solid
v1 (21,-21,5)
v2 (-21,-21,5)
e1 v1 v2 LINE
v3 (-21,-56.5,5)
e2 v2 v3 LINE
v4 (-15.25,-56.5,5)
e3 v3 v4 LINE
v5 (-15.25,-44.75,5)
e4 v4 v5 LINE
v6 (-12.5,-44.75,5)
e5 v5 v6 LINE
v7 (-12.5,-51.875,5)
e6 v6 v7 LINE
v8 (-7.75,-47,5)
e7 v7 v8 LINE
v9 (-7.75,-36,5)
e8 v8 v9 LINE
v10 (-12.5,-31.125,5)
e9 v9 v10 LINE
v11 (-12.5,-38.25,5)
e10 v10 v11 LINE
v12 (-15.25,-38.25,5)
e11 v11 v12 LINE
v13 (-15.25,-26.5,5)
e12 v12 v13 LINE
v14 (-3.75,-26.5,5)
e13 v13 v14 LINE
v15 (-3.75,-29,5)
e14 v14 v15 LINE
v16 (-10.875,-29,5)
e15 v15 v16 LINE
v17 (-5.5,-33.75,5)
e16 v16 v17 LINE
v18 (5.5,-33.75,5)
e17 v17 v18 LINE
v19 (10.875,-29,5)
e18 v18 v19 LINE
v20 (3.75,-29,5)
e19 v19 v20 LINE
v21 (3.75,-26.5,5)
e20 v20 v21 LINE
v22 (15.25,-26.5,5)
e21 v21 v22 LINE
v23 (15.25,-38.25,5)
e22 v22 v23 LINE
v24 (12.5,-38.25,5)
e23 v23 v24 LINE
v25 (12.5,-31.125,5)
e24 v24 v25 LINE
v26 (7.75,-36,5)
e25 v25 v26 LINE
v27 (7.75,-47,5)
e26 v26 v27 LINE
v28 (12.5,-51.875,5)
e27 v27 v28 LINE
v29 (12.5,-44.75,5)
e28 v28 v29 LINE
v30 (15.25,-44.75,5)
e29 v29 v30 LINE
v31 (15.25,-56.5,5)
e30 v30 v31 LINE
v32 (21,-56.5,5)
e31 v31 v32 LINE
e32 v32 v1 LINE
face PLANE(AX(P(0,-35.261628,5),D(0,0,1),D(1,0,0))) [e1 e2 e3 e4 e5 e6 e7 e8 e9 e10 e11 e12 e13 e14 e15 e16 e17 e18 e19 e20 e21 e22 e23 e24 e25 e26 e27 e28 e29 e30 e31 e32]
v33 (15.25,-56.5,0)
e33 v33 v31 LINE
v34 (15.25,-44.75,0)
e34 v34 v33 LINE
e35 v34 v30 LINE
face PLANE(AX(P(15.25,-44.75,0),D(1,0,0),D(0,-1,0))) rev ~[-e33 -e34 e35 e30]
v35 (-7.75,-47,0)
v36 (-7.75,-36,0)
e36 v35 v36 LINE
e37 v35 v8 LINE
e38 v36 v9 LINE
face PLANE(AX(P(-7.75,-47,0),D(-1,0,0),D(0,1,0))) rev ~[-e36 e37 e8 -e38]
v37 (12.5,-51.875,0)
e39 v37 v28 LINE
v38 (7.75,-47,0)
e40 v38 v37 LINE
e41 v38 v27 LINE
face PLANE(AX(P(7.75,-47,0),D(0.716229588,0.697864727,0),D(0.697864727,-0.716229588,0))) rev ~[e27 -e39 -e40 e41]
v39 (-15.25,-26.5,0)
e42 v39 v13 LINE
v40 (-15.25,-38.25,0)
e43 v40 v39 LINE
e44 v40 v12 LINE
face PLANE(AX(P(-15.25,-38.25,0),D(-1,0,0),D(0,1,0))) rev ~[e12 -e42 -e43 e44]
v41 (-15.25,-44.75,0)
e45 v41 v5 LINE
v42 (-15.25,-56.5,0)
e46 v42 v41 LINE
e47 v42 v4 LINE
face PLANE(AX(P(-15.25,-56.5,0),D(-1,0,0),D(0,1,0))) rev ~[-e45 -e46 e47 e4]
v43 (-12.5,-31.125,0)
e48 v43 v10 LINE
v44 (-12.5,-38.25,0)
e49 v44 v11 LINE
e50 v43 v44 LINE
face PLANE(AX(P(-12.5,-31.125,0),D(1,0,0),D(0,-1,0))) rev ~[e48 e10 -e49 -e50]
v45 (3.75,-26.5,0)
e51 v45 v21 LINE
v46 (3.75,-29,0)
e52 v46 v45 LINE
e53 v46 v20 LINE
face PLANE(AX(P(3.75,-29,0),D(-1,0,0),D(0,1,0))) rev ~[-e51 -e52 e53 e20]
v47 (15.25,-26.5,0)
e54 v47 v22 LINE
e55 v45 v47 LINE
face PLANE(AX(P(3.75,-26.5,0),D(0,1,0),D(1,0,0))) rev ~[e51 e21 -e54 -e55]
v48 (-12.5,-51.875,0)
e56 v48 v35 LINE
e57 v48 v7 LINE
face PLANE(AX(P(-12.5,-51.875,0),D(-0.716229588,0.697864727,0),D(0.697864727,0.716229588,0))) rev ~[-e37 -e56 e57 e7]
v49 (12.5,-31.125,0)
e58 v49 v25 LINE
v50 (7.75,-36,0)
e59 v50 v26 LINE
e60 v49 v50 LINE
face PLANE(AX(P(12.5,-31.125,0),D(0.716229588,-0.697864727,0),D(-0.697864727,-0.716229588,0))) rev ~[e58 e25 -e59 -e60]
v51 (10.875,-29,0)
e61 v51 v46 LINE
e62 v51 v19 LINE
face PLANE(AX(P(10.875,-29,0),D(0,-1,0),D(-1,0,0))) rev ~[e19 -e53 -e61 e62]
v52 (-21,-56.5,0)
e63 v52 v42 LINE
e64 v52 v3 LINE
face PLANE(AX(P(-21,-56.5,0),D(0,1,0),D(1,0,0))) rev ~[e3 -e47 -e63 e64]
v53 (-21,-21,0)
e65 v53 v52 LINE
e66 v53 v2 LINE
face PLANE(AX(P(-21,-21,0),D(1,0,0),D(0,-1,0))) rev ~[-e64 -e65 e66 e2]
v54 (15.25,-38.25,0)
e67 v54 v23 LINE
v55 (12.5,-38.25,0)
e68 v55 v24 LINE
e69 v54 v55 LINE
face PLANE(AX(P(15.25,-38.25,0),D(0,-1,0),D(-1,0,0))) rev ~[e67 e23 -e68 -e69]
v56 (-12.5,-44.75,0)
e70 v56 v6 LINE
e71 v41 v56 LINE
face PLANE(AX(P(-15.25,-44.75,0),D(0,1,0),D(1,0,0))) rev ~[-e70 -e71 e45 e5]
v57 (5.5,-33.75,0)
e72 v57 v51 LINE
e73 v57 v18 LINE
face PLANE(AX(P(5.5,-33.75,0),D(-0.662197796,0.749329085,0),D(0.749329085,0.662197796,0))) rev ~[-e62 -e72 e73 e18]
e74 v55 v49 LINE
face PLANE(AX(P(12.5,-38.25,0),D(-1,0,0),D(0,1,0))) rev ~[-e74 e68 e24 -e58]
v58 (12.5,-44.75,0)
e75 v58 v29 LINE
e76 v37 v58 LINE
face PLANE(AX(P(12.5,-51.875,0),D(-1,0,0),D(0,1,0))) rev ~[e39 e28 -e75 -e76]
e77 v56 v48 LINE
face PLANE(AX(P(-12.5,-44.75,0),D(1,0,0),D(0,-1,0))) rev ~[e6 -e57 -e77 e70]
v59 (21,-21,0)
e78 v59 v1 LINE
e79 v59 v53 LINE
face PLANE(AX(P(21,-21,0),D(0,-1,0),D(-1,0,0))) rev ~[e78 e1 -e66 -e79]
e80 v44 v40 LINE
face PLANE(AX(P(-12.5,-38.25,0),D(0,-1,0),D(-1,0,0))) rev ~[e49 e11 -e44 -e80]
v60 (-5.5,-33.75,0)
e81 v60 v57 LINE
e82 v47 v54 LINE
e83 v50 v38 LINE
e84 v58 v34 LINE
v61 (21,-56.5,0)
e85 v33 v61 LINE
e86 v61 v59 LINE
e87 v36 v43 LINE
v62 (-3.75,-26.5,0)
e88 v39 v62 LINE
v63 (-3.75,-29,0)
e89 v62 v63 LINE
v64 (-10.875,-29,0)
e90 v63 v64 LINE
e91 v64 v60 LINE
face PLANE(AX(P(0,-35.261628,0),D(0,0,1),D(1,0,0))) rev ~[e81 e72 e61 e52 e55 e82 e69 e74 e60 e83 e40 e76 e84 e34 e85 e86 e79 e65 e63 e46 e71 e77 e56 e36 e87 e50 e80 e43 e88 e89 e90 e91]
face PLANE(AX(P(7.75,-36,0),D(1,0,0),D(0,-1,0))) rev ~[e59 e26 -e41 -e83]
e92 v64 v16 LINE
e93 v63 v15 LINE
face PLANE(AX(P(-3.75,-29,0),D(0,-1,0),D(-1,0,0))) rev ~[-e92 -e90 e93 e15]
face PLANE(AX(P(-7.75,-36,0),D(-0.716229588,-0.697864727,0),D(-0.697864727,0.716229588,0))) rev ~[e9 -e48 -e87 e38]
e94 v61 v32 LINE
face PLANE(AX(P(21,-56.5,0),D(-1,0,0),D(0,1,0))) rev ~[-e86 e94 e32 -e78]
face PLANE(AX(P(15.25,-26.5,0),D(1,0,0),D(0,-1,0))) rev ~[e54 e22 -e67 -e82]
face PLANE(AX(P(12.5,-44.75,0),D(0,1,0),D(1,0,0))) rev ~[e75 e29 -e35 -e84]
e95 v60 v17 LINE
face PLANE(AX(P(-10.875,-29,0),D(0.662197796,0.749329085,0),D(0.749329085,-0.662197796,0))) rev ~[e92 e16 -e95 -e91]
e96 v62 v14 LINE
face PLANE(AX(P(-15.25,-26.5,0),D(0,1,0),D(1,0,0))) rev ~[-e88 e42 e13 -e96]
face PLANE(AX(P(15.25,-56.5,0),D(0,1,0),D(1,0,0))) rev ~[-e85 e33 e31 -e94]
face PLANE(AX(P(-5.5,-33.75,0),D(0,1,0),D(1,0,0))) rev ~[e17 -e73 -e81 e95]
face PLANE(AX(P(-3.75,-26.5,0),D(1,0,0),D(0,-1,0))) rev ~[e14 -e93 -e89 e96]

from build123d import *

# Parameters (mm, degrees)
F1_DEPTH = 5


# Not quite as in the source:
# - a feature names something its author has since deleted; it is built from what else it names


with BuildPart() as f1:
    # F0 (on Top) → F1 (new body)
    with BuildSketch(Plane.XY):
        Polygon((-3.25, -21), (-21, -21), (-21, -26.5), (-21, -56.5), (-15.25, -56.5), (-15.25, -44.75), (-15.25, -38.25), (-15.25, -26.5), (-3.75, -26.5), (0, -26.5), (3.75, -26.5), (15.25, -26.5), (15.25, -38.25), (15.25, -44.75), (15.25, -56.5), (21, -56.5), (21, -26.5), (21, -21), (3.25, -21), (0, -21), align=None)
        Polygon((0, -26.5), (-3.75, -26.5), (-3.75, -29), (-10.875, -29), (-5.5, -33.75), (0, -33.75), (5.5, -33.75), (10.875, -29), (3.75, -29), (3.75, -26.5), align=None)
        Polygon((-15.25, -38.25), (-15.25, -44.75), (-12.5, -44.75), (-12.5, -51.875), (-7.75, -47), (-7.75, -41.5), (-7.75, -36), (-12.5, -31.125), (-12.5, -38.25), align=None)
        Polygon((12.5, -44.75), (15.25, -44.75), (15.25, -38.25), (12.5, -38.25), (12.5, -31.125), (7.75, -36), (7.75, -41.5), (7.75, -47), (12.5, -51.875), align=None)
    extrude(amount=F1_DEPTH)


solid = f1.part
